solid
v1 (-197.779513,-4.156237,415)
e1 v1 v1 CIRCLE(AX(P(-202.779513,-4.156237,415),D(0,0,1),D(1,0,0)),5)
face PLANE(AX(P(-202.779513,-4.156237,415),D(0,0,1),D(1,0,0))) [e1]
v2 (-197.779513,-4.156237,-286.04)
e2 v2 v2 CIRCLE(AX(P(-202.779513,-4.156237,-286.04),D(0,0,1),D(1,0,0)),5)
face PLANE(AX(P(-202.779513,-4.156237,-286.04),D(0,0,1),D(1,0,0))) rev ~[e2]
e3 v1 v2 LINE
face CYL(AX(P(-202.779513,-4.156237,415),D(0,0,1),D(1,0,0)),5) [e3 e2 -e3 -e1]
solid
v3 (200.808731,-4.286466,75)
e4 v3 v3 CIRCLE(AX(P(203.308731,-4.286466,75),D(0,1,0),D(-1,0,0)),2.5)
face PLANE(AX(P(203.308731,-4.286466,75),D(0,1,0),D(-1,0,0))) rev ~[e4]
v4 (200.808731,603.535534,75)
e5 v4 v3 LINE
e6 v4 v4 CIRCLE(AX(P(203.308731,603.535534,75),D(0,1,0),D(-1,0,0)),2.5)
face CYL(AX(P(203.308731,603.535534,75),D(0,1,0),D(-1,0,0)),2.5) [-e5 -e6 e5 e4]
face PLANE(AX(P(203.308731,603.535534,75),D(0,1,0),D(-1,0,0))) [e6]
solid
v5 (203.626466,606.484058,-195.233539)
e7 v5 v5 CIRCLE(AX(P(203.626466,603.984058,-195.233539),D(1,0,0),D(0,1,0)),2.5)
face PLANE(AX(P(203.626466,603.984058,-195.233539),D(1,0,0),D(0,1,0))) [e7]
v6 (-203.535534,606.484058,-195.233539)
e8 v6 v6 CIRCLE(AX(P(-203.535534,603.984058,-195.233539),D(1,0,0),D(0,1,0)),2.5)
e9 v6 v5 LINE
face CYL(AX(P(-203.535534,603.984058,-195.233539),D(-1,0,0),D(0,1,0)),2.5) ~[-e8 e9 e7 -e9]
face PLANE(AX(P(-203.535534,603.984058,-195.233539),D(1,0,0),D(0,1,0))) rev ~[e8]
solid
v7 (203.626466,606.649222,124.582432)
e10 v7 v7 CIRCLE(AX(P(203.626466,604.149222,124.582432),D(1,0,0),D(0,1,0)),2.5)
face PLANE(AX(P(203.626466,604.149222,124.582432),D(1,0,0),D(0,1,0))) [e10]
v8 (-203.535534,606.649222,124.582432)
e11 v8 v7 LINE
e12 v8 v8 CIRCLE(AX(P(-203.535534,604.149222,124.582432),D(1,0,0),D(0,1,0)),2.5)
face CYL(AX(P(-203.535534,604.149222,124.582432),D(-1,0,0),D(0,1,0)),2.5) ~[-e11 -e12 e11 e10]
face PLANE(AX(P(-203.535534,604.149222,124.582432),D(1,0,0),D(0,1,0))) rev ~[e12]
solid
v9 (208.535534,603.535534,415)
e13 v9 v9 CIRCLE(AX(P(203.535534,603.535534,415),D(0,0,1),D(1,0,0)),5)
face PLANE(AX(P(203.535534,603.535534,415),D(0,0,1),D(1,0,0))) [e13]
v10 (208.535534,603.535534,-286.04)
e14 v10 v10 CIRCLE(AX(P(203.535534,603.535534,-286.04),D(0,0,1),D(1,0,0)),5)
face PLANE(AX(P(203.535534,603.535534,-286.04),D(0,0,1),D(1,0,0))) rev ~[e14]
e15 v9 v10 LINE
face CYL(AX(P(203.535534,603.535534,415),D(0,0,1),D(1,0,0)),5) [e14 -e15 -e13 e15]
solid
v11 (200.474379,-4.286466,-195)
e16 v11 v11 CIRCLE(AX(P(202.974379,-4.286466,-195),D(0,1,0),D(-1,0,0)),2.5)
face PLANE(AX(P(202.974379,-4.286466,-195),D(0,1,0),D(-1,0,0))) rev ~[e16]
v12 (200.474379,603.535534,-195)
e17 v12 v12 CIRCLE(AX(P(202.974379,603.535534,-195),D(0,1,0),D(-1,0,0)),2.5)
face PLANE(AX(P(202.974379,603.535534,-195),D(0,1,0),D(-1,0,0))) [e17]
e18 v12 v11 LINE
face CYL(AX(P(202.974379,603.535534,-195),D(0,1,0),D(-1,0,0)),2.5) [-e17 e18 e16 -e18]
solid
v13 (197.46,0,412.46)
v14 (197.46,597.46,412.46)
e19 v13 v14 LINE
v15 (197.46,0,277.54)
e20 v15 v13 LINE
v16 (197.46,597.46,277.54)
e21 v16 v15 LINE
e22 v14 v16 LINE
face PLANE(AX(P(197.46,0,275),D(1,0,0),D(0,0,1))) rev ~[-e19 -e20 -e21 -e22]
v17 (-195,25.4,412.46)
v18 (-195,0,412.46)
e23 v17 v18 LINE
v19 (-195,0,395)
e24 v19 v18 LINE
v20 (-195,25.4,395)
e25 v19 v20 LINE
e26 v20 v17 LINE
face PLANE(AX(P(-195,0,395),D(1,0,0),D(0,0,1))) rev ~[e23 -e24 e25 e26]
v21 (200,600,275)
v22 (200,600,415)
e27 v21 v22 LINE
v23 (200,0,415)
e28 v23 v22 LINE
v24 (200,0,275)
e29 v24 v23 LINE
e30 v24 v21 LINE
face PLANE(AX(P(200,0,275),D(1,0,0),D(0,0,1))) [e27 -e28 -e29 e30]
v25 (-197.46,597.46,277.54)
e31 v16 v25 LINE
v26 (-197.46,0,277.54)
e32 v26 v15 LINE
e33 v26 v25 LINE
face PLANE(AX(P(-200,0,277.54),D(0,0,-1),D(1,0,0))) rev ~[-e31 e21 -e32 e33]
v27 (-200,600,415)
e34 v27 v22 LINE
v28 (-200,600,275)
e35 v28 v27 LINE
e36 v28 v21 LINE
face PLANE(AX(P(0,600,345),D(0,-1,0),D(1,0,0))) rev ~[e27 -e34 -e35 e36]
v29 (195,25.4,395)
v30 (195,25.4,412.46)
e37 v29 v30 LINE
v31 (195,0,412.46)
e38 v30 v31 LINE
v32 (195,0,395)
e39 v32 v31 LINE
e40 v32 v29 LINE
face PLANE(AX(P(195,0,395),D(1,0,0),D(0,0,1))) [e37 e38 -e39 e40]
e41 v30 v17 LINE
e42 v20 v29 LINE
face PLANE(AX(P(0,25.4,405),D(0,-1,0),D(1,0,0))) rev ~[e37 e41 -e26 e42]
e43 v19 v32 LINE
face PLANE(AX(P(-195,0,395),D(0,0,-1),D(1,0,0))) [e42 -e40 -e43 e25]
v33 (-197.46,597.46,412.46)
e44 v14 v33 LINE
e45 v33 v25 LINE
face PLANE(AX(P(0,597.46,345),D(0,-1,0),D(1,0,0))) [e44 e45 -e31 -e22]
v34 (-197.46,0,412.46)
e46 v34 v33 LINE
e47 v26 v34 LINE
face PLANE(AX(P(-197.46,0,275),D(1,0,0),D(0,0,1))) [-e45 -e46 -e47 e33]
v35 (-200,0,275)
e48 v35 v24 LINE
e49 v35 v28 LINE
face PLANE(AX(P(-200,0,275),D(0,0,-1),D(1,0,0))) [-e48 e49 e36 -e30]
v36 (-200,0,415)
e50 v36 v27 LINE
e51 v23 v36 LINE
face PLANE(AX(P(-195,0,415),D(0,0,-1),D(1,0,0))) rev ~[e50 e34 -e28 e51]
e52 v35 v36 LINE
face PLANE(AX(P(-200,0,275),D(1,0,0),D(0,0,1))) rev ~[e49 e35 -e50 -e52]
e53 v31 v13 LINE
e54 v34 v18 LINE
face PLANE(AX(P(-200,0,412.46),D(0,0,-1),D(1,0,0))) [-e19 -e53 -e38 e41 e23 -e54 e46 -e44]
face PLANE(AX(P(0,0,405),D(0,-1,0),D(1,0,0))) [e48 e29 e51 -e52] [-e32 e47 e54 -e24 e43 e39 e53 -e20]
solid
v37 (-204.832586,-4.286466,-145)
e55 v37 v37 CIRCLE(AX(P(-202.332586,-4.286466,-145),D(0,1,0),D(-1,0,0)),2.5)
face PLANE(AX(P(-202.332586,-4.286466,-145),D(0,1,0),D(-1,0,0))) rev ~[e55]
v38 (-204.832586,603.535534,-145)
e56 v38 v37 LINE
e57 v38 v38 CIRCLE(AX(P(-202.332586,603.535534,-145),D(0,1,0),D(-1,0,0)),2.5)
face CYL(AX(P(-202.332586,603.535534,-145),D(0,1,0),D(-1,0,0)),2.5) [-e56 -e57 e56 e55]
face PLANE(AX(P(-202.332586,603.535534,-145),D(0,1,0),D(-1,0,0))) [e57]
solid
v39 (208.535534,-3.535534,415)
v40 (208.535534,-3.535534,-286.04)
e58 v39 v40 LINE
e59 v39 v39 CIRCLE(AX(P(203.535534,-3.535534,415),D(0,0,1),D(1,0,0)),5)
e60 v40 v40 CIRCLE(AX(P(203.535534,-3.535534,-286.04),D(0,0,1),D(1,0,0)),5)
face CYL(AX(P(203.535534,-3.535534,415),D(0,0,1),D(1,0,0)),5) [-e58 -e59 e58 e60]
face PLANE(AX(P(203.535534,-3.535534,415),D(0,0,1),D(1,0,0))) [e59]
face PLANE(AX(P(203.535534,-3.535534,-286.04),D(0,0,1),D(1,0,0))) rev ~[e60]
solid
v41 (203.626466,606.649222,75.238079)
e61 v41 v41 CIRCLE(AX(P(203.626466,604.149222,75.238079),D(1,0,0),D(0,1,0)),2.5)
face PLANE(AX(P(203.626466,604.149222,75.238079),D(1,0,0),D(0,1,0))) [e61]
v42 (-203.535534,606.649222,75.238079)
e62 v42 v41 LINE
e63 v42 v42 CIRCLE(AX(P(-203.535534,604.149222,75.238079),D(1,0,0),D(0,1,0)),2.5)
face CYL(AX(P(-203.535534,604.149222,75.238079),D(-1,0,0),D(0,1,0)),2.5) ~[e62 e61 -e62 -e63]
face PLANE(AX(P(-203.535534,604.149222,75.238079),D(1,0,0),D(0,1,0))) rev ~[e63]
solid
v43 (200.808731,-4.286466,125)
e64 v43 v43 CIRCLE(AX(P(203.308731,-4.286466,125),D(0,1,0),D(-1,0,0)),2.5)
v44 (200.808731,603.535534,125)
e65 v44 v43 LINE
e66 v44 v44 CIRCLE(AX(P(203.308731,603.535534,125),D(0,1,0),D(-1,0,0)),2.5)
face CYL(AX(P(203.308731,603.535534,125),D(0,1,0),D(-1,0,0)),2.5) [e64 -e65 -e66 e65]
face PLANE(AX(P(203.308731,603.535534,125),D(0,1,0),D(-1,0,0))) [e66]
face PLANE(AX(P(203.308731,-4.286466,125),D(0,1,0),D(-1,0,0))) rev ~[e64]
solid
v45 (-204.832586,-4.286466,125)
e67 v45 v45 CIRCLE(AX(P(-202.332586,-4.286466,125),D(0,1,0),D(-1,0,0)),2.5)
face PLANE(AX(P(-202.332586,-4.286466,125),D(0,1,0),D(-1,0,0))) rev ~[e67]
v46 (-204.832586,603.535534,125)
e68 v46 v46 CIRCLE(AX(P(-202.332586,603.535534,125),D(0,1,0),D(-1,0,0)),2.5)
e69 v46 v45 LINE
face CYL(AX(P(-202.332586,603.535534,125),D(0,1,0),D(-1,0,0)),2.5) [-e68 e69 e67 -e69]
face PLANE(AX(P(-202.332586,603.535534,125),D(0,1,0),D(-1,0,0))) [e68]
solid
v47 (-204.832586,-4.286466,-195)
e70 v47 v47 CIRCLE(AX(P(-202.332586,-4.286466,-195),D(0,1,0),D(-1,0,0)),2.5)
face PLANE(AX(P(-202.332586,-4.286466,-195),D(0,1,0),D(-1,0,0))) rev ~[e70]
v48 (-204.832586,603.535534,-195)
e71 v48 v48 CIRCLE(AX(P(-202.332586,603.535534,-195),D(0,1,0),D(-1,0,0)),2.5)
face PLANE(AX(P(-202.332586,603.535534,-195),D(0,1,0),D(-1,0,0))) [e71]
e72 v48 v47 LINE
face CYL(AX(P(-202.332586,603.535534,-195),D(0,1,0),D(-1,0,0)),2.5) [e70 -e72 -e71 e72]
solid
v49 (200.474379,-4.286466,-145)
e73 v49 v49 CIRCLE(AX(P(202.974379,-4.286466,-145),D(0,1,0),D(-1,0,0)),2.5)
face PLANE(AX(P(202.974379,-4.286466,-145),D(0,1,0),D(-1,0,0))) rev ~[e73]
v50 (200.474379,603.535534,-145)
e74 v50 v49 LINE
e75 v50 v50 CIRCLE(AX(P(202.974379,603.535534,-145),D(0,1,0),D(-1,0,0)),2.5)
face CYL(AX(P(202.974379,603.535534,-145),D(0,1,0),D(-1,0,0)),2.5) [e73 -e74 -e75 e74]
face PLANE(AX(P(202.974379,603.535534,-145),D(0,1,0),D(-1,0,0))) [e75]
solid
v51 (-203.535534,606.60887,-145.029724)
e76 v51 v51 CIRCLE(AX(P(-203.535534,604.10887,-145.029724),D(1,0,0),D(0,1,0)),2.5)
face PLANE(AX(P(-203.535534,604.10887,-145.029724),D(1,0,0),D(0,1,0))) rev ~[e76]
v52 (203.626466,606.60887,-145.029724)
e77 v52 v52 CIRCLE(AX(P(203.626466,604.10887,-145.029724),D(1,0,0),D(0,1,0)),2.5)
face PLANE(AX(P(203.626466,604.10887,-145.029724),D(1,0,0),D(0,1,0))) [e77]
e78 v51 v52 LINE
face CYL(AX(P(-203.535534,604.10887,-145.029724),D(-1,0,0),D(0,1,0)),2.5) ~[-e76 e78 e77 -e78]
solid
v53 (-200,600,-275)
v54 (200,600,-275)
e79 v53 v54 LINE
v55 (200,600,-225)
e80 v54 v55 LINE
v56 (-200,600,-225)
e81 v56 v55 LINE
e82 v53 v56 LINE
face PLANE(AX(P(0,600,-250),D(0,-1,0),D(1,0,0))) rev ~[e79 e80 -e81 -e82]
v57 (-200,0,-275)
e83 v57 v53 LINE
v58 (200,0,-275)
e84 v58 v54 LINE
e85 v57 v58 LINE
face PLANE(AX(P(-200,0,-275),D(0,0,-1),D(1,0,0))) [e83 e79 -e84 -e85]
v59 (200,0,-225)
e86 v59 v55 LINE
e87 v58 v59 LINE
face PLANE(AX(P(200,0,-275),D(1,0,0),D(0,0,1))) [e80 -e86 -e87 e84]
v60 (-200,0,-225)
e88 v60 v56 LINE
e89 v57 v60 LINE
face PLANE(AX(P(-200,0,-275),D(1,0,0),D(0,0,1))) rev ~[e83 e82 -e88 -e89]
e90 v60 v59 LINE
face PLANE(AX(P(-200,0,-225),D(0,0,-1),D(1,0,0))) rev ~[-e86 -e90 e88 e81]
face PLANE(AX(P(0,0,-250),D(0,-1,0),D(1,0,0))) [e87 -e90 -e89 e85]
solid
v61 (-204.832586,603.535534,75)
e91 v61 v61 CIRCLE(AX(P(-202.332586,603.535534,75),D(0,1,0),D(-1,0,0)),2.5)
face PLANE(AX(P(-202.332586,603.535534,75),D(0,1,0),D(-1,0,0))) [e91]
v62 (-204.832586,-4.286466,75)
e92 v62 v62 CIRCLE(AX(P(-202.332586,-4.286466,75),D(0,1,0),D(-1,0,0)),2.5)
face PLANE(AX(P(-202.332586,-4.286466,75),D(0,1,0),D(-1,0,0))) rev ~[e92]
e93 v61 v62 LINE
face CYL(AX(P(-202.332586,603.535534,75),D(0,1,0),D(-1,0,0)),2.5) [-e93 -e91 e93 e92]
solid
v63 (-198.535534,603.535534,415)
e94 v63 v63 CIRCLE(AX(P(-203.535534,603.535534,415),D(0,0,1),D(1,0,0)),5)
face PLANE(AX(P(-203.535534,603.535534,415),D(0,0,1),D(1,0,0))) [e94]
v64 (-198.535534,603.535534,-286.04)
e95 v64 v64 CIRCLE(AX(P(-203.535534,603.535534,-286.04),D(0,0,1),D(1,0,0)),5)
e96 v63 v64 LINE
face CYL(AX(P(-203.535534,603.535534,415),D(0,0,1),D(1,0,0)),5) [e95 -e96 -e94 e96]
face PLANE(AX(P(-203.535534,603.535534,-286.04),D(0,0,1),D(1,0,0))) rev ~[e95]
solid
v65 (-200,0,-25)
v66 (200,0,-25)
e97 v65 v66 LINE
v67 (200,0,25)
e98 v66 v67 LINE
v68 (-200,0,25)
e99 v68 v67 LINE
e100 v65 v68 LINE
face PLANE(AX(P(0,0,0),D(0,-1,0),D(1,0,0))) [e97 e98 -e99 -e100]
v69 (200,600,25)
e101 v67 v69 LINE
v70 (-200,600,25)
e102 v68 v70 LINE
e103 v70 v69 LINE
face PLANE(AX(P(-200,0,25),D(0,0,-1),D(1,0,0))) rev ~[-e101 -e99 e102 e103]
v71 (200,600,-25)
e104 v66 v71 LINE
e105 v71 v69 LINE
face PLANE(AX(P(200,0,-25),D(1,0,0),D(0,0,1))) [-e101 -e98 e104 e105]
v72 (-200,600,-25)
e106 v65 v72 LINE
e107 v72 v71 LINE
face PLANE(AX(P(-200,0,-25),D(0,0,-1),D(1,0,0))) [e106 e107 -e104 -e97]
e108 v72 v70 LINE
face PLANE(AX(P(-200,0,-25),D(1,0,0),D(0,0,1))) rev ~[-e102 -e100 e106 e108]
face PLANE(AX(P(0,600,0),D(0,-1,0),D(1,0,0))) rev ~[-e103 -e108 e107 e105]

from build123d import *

# Parameters (mm, degrees)
F0_W      = 400
F0_H      = 140
F1_DEPTH  = 600
F0_H_2    = 50
F2_R      = 5
F3_DEPTH  = 701.04
F5_T      = -2.54
F4_W      = 390
F4_H      = 20
F6_DEPTH  = 25.4
F8_R      = 2.5
F9_DEPTH  = 607.822
F11_R     = 2.5
F12_DEPTH = 407.162


with BuildPart() as f1:
    # F0 (on Front) → F1 (new body)
    with BuildSketch(Plane.XZ):
        with Locations((0, 345)):
            Rectangle(F0_W, F0_H)
    extrude(amount=-F1_DEPTH)

    # F5
    f5_openings = [f1.faces().sort_by_distance(p)[0] for p in [
        (0, 0, 345),
    ]]
    offset(amount=F5_T, openings=f5_openings)

    # F4 (on face) → F6 (join)
    with BuildSketch(Plane.XZ):
        with Locations((0, 405)):
            Rectangle(F4_W, F4_H)
    extrude(amount=-F6_DEPTH)


with BuildPart() as f1b:
    # F0 (on Front) → F1, piece 2 (new body)
    with BuildSketch(Plane.XZ):
        Rectangle(F0_W, F0_H_2)
    extrude(amount=-F1_DEPTH)


with BuildPart() as f1c:
    # F0 (on Front) → F1, piece 3 (new body)
    with BuildSketch(Plane.XZ):
        with Locations((0, -250)):
            Rectangle(F0_W, F0_H_2)
    extrude(amount=-F1_DEPTH)


with BuildPart() as f3:
    # F2 (on face) → F3 (new body)
    with BuildSketch(Plane.XY.offset(415)):
        with Locations((203.5355339059, -3.5355339059)):
            Circle(F2_R)
    extrude(amount=-F3_DEPTH)


with BuildPart() as f3b:
    # F2 (on face) → F3, piece 2 (new body)
    with BuildSketch(Plane.XY.offset(415)):
        with Locations((203.5355339059, 603.5355339059)):
            Circle(F2_R)
    extrude(amount=-F3_DEPTH)


with BuildPart() as f3c:
    # F2 (on face) → F3, piece 3 (new body)
    with BuildSketch(Plane.XY.offset(415)):
        with Locations((-203.5355339059, 603.5355339059)):
            Circle(F2_R)
    extrude(amount=-F3_DEPTH)


with BuildPart() as f3d:
    # F2 (on face) → F3, piece 4 (new body)
    with BuildSketch(Plane.XY.offset(415)):
        with Locations((-202.7795129572, -4.156237207)):
            Circle(F2_R)
    extrude(amount=-F3_DEPTH)


with BuildPart() as f9:
    # F8 (on face) → F9 (new body)
    with BuildSketch(Plane(origin=(0, 603.5355339059, 0), x_dir=(-1, 0, 0), z_dir=(0, 1, 0))):
        with Locations((202.33258605, 125)):
            Circle(F8_R)
    extrude(amount=-F9_DEPTH)


with BuildPart() as f9b:
    # F8 (on face) → F9, piece 2 (new body)
    with BuildSketch(Plane(origin=(0, 603.5355339059, 0), x_dir=(-1, 0, 0), z_dir=(0, 1, 0))):
        with Locations((202.33258605, 75)):
            Circle(F8_R)
    extrude(amount=-F9_DEPTH)


with BuildPart() as f9c:
    # F8 (on face) → F9, piece 3 (new body)
    with BuildSketch(Plane(origin=(0, 603.5355339059, 0), x_dir=(-1, 0, 0), z_dir=(0, 1, 0))):
        with Locations((-203.3087313175, 125)):
            Circle(F8_R)
    extrude(amount=-F9_DEPTH)


with BuildPart() as f9d:
    # F8 (on face) → F9, piece 4 (new body)
    with BuildSketch(Plane(origin=(0, 603.5355339059, 0), x_dir=(-1, 0, 0), z_dir=(0, 1, 0))):
        with Locations((-203.3087313175, 75)):
            Circle(F8_R)
    extrude(amount=-F9_DEPTH)


with BuildPart() as f9e:
    # F8 (on face) → F9, piece 5 (new body)
    with BuildSketch(Plane(origin=(0, 603.5355339059, 0), x_dir=(-1, 0, 0), z_dir=(0, 1, 0))):
        with Locations((202.33258605, -145)):
            Circle(F8_R)
    extrude(amount=-F9_DEPTH)


with BuildPart() as f9f:
    # F8 (on face) → F9, piece 6 (new body)
    with BuildSketch(Plane(origin=(0, 603.5355339059, 0), x_dir=(-1, 0, 0), z_dir=(0, 1, 0))):
        with Locations((202.33258605, -195)):
            Circle(F8_R)
    extrude(amount=-F9_DEPTH)


with BuildPart() as f9g:
    # F8 (on face) → F9, piece 7 (new body)
    with BuildSketch(Plane(origin=(0, 603.5355339059, 0), x_dir=(-1, 0, 0), z_dir=(0, 1, 0))):
        with Locations((-202.9743790627, -145)):
            Circle(F8_R)
    extrude(amount=-F9_DEPTH)


with BuildPart() as f9h:
    # F8 (on face) → F9, piece 8 (new body)
    with BuildSketch(Plane(origin=(0, 603.5355339059, 0), x_dir=(-1, 0, 0), z_dir=(0, 1, 0))):
        with Locations((-202.9743790627, -195)):
            Circle(F8_R)
    extrude(amount=-F9_DEPTH)


with BuildPart() as f12:
    # F11 (on face) → F12 (new body)
    with BuildSketch(Plane.YZ.offset(-203.5355339059)):
        with Locations((604.149222374, 124.5824322104)):
            Circle(F11_R)
    extrude(amount=F12_DEPTH)


with BuildPart() as f12b:
    # F11 (on face) → F12, piece 2 (new body)
    with BuildSketch(Plane.YZ.offset(-203.5355339059)):
        with Locations((604.149222374, 75.2380788326)):
            Circle(F11_R)
    extrude(amount=F12_DEPTH)


with BuildPart() as f12c:
    # F11 (on face) → F12, piece 3 (new body)
    with BuildSketch(Plane.YZ.offset(-203.5355339059)):
        with Locations((604.1088700294, -145.0297236443)):
            Circle(F11_R)
    extrude(amount=F12_DEPTH)


with BuildPart() as f12d:
    # F11 (on face) → F12, piece 4 (new body)
    with BuildSketch(Plane.YZ.offset(-203.5355339059)):
        with Locations((603.9840579033, -195.2335387468)):
            Circle(F11_R)
    extrude(amount=F12_DEPTH)


solid = Compound([f1.part, f1b.part, f1c.part, f3.part, f3b.part, f3c.part, f3d.part, f9.part, f9b.part, f9c.part, f9d.part, f9e.part, f9f.part, f9g.part, f9h.part, f12.part, f12b.part, f12c.part, f12d.part])
